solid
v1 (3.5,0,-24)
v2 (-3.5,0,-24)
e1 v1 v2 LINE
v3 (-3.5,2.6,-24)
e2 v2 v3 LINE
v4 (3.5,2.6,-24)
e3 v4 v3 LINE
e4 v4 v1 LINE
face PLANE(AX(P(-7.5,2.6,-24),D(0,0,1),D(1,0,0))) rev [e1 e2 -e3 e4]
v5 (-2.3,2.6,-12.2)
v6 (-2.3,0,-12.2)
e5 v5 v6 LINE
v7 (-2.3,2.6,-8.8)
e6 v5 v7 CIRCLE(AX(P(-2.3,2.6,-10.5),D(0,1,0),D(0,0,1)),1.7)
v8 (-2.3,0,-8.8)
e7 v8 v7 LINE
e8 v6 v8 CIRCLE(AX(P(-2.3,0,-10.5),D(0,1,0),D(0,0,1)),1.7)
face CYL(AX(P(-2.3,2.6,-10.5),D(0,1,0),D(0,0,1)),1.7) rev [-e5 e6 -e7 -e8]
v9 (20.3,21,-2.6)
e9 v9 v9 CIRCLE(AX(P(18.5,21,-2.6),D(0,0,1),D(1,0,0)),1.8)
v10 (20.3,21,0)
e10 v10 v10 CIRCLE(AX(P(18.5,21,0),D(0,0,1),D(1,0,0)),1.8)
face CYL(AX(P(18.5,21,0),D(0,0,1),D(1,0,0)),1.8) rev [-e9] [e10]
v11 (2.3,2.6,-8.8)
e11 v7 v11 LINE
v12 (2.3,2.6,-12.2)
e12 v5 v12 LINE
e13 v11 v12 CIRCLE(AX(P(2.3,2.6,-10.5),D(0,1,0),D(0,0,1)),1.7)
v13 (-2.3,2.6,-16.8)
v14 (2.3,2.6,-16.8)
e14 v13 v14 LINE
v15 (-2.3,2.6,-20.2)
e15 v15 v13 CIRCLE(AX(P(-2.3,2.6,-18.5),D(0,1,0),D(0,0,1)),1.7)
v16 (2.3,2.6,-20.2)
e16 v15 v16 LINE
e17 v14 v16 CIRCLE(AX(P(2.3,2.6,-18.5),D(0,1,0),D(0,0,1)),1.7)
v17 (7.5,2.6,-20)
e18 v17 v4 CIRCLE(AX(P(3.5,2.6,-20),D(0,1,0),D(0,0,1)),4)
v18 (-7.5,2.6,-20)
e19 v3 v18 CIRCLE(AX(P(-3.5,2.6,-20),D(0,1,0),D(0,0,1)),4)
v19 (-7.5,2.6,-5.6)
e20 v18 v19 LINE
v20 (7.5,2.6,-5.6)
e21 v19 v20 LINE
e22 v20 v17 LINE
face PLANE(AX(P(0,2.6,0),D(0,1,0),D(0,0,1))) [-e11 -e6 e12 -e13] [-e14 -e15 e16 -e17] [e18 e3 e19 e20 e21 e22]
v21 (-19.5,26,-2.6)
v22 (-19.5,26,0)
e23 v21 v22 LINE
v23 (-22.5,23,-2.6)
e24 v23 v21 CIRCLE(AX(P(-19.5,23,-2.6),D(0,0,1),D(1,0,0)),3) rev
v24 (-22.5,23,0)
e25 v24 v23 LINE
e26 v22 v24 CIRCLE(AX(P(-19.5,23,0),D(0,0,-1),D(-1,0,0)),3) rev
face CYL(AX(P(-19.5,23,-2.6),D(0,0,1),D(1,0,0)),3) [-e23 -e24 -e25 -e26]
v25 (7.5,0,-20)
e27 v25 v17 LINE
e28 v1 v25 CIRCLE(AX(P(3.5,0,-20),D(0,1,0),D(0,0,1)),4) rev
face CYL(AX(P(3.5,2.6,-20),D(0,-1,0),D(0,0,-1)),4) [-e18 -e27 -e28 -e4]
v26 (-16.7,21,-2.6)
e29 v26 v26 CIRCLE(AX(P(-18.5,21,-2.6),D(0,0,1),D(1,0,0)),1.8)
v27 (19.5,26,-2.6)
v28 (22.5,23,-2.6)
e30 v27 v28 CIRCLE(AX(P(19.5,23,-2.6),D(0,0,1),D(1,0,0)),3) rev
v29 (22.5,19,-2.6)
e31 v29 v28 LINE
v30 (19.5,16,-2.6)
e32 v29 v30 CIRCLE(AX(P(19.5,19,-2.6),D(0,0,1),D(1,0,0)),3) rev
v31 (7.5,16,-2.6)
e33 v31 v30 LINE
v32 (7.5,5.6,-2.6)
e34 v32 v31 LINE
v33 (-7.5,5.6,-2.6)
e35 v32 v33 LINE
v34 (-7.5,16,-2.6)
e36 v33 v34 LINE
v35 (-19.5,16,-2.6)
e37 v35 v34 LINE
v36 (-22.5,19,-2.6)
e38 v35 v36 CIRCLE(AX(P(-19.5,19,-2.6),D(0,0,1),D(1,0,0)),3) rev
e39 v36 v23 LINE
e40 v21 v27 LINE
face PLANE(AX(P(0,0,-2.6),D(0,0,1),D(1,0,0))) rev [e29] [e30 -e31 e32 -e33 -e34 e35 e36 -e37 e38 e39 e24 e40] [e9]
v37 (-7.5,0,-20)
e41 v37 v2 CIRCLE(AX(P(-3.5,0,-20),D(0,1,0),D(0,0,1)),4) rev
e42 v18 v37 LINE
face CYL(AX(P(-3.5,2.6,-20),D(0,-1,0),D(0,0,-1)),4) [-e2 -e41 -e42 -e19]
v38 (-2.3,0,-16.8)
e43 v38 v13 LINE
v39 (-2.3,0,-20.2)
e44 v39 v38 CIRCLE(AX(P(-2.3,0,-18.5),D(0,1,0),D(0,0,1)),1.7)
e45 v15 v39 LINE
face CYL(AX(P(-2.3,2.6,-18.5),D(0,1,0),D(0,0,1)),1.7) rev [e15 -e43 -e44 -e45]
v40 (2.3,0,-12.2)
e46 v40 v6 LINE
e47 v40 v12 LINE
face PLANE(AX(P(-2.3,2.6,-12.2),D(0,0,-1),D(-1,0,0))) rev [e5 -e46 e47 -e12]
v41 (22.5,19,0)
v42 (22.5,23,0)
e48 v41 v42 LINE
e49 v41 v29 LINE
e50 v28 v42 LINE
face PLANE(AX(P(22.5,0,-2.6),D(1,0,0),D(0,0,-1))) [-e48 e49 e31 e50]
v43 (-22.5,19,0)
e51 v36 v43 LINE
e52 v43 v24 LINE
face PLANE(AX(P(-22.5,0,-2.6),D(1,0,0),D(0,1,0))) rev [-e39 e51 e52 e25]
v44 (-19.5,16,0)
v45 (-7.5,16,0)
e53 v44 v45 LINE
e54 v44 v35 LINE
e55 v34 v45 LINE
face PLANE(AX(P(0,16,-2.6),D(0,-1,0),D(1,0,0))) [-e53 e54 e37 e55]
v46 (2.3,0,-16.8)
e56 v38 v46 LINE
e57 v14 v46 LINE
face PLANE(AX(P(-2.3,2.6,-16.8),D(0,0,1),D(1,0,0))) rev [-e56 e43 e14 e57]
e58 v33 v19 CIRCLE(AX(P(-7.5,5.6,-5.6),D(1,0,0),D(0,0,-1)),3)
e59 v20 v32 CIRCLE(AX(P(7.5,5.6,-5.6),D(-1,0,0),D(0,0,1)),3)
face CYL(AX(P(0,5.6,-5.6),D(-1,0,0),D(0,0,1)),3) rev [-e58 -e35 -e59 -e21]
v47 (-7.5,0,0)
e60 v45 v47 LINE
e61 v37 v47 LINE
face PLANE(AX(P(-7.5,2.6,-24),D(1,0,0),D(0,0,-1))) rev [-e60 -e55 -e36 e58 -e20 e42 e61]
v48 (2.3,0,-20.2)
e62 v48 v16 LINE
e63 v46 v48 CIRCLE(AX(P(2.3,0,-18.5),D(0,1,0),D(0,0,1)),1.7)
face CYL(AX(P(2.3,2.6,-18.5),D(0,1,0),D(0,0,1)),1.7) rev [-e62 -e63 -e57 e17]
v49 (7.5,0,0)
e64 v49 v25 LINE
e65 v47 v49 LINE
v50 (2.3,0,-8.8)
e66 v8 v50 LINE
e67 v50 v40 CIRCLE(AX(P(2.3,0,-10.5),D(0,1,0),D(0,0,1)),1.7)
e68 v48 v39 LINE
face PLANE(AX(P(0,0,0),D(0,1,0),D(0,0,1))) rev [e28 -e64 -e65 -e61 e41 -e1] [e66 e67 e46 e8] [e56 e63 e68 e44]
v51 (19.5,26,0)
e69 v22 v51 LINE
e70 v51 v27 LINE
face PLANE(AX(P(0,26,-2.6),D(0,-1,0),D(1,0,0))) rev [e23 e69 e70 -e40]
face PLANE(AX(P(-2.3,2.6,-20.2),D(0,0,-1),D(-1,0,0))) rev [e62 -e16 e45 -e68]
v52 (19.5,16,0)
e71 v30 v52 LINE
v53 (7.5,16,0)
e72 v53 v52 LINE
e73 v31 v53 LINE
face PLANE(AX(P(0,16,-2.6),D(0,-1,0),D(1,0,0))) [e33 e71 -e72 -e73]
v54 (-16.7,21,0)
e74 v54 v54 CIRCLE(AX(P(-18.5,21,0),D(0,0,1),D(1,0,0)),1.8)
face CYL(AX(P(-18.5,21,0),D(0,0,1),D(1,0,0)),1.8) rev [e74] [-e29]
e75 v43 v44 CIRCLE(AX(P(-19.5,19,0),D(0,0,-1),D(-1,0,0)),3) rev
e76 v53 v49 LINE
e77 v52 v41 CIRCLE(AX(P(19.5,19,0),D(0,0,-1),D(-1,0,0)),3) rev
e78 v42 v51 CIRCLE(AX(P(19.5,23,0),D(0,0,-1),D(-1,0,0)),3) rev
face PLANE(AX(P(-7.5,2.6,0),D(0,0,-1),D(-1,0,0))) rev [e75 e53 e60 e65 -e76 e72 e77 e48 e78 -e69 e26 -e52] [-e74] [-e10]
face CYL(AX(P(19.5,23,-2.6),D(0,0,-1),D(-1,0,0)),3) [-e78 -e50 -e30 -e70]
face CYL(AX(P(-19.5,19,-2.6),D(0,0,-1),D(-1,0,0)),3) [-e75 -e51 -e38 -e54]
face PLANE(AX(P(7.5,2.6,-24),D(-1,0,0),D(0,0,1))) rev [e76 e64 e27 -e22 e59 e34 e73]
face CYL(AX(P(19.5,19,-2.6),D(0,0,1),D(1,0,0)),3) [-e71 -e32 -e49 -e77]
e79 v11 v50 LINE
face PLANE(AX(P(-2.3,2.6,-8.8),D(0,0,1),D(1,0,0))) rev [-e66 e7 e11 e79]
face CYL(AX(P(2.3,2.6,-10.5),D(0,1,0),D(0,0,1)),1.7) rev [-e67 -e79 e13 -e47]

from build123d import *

# Parameters (mm, degrees)
SKETCH_2_W             = 15
SKETCH_2_H             = 24
EXTRUDE_1_DEPTH        = 2.6
SKETCH_5_W             = 15
SKETCH_5_H             = 13.4
EXTRUDE_2_DEPTH        = 2.6
FILLET_1_R             = 4
HOLE_WIZARD_M3_3_D     = 3.6
HOLE_WIZARD_M3_3_DEPTH = 32.75
HOLE_WIZARD_M3_3_TIP   = 1.081549114
FILLET_2_R             = 3
FILLET_3_R             = 3
HOLE_WIZARD_M3_5_DEPTH = 2.6


# Read off the part's stored shape, not the designer's step: M3 间隙槽口5
with BuildPart() as part:
    # 草图2 → 凸台-拉伸1 (new body)
    with BuildSketch(Plane(origin=(0, 0, 0), x_dir=(1, 0, 0), z_dir=(0, 1, 0))):
        with Locations((0, 12)):
            Rectangle(SKETCH_2_W, SKETCH_2_H)
    extrude(amount=EXTRUDE_1_DEPTH)

    # 草图5 → 凸台-拉伸2 (add)
    with BuildSketch(Plane.XY):
        with Locations((0, 9.3)):
            Rectangle(SKETCH_5_W, SKETCH_5_H)
        Polygon((-22.5, 16), (-7.5, 16), (7.5, 16), (22.5, 16), (22.5, 26), (-22.5, 26), align=None)
    extrude(amount=-EXTRUDE_2_DEPTH)

    # 圆角1
    fillet_1_edges = [part.edges().sort_by_distance(p)[0] for p in [
        (-7.5, 1.3, -24),
        (7.5, 1.3, -24),
    ]]
    fillet(fillet_1_edges, radius=FILLET_1_R)

    # M3 间隙槽口3
    with Locations(Plane.XY):
        with Locations((-18.5, 21), (18.5, 21)):
            Hole(HOLE_WIZARD_M3_3_D / 2, depth=HOLE_WIZARD_M3_3_DEPTH)
            with Locations((0, 0, -(HOLE_WIZARD_M3_3_DEPTH + HOLE_WIZARD_M3_3_TIP / 2))):  # 118° drill point
                Cone(0, HOLE_WIZARD_M3_3_D / 2, HOLE_WIZARD_M3_3_TIP, mode=Mode.SUBTRACT)

    # 圆角2
    fillet_2_edges = [part.edges().sort_by_distance(p)[0] for p in [
        (-22.5, 16, -1.3),
        (-22.5, 26, -1.3),
        (22.5, 26, -1.3),
        (22.5, 16, -1.3),
    ]]
    fillet(fillet_2_edges, radius=FILLET_2_R)

    # 圆角3
    fillet_3_edges = [part.edges().sort_by_distance(p)[0] for p in [
        (0, 2.6, -2.6),
    ]]
    fillet(fillet_3_edges, radius=FILLET_3_R)

    # M3 间隙槽口5 outline → M3 间隙槽口5 (cut)
    with BuildSketch(Plane(origin=(0, 0, 0), x_dir=(1, 0, 0), z_dir=(0, 1, 0))):
        with BuildLine():
            ThreePointArc((2.3, 8.8), (4, 10.5), (2.3, 12.2))
            Line((2.3, 12.2), (-2.3, 12.2))
            ThreePointArc((-2.3, 12.2), (-4, 10.5), (-2.3, 8.8))
            Line((-2.3, 8.8), (2.3, 8.8))
        make_face()
        with BuildLine():
            Line((-2.3, 16.8), (2.3, 16.8))
            ThreePointArc((2.3, 16.8), (4, 18.5), (2.3, 20.2))
            Line((2.3, 20.2), (-2.3, 20.2))
            ThreePointArc((-2.3, 20.2), (-4, 18.5), (-2.3, 16.8))
        make_face()
    extrude(amount=HOLE_WIZARD_M3_5_DEPTH, mode=Mode.SUBTRACT)


solid = part.part
